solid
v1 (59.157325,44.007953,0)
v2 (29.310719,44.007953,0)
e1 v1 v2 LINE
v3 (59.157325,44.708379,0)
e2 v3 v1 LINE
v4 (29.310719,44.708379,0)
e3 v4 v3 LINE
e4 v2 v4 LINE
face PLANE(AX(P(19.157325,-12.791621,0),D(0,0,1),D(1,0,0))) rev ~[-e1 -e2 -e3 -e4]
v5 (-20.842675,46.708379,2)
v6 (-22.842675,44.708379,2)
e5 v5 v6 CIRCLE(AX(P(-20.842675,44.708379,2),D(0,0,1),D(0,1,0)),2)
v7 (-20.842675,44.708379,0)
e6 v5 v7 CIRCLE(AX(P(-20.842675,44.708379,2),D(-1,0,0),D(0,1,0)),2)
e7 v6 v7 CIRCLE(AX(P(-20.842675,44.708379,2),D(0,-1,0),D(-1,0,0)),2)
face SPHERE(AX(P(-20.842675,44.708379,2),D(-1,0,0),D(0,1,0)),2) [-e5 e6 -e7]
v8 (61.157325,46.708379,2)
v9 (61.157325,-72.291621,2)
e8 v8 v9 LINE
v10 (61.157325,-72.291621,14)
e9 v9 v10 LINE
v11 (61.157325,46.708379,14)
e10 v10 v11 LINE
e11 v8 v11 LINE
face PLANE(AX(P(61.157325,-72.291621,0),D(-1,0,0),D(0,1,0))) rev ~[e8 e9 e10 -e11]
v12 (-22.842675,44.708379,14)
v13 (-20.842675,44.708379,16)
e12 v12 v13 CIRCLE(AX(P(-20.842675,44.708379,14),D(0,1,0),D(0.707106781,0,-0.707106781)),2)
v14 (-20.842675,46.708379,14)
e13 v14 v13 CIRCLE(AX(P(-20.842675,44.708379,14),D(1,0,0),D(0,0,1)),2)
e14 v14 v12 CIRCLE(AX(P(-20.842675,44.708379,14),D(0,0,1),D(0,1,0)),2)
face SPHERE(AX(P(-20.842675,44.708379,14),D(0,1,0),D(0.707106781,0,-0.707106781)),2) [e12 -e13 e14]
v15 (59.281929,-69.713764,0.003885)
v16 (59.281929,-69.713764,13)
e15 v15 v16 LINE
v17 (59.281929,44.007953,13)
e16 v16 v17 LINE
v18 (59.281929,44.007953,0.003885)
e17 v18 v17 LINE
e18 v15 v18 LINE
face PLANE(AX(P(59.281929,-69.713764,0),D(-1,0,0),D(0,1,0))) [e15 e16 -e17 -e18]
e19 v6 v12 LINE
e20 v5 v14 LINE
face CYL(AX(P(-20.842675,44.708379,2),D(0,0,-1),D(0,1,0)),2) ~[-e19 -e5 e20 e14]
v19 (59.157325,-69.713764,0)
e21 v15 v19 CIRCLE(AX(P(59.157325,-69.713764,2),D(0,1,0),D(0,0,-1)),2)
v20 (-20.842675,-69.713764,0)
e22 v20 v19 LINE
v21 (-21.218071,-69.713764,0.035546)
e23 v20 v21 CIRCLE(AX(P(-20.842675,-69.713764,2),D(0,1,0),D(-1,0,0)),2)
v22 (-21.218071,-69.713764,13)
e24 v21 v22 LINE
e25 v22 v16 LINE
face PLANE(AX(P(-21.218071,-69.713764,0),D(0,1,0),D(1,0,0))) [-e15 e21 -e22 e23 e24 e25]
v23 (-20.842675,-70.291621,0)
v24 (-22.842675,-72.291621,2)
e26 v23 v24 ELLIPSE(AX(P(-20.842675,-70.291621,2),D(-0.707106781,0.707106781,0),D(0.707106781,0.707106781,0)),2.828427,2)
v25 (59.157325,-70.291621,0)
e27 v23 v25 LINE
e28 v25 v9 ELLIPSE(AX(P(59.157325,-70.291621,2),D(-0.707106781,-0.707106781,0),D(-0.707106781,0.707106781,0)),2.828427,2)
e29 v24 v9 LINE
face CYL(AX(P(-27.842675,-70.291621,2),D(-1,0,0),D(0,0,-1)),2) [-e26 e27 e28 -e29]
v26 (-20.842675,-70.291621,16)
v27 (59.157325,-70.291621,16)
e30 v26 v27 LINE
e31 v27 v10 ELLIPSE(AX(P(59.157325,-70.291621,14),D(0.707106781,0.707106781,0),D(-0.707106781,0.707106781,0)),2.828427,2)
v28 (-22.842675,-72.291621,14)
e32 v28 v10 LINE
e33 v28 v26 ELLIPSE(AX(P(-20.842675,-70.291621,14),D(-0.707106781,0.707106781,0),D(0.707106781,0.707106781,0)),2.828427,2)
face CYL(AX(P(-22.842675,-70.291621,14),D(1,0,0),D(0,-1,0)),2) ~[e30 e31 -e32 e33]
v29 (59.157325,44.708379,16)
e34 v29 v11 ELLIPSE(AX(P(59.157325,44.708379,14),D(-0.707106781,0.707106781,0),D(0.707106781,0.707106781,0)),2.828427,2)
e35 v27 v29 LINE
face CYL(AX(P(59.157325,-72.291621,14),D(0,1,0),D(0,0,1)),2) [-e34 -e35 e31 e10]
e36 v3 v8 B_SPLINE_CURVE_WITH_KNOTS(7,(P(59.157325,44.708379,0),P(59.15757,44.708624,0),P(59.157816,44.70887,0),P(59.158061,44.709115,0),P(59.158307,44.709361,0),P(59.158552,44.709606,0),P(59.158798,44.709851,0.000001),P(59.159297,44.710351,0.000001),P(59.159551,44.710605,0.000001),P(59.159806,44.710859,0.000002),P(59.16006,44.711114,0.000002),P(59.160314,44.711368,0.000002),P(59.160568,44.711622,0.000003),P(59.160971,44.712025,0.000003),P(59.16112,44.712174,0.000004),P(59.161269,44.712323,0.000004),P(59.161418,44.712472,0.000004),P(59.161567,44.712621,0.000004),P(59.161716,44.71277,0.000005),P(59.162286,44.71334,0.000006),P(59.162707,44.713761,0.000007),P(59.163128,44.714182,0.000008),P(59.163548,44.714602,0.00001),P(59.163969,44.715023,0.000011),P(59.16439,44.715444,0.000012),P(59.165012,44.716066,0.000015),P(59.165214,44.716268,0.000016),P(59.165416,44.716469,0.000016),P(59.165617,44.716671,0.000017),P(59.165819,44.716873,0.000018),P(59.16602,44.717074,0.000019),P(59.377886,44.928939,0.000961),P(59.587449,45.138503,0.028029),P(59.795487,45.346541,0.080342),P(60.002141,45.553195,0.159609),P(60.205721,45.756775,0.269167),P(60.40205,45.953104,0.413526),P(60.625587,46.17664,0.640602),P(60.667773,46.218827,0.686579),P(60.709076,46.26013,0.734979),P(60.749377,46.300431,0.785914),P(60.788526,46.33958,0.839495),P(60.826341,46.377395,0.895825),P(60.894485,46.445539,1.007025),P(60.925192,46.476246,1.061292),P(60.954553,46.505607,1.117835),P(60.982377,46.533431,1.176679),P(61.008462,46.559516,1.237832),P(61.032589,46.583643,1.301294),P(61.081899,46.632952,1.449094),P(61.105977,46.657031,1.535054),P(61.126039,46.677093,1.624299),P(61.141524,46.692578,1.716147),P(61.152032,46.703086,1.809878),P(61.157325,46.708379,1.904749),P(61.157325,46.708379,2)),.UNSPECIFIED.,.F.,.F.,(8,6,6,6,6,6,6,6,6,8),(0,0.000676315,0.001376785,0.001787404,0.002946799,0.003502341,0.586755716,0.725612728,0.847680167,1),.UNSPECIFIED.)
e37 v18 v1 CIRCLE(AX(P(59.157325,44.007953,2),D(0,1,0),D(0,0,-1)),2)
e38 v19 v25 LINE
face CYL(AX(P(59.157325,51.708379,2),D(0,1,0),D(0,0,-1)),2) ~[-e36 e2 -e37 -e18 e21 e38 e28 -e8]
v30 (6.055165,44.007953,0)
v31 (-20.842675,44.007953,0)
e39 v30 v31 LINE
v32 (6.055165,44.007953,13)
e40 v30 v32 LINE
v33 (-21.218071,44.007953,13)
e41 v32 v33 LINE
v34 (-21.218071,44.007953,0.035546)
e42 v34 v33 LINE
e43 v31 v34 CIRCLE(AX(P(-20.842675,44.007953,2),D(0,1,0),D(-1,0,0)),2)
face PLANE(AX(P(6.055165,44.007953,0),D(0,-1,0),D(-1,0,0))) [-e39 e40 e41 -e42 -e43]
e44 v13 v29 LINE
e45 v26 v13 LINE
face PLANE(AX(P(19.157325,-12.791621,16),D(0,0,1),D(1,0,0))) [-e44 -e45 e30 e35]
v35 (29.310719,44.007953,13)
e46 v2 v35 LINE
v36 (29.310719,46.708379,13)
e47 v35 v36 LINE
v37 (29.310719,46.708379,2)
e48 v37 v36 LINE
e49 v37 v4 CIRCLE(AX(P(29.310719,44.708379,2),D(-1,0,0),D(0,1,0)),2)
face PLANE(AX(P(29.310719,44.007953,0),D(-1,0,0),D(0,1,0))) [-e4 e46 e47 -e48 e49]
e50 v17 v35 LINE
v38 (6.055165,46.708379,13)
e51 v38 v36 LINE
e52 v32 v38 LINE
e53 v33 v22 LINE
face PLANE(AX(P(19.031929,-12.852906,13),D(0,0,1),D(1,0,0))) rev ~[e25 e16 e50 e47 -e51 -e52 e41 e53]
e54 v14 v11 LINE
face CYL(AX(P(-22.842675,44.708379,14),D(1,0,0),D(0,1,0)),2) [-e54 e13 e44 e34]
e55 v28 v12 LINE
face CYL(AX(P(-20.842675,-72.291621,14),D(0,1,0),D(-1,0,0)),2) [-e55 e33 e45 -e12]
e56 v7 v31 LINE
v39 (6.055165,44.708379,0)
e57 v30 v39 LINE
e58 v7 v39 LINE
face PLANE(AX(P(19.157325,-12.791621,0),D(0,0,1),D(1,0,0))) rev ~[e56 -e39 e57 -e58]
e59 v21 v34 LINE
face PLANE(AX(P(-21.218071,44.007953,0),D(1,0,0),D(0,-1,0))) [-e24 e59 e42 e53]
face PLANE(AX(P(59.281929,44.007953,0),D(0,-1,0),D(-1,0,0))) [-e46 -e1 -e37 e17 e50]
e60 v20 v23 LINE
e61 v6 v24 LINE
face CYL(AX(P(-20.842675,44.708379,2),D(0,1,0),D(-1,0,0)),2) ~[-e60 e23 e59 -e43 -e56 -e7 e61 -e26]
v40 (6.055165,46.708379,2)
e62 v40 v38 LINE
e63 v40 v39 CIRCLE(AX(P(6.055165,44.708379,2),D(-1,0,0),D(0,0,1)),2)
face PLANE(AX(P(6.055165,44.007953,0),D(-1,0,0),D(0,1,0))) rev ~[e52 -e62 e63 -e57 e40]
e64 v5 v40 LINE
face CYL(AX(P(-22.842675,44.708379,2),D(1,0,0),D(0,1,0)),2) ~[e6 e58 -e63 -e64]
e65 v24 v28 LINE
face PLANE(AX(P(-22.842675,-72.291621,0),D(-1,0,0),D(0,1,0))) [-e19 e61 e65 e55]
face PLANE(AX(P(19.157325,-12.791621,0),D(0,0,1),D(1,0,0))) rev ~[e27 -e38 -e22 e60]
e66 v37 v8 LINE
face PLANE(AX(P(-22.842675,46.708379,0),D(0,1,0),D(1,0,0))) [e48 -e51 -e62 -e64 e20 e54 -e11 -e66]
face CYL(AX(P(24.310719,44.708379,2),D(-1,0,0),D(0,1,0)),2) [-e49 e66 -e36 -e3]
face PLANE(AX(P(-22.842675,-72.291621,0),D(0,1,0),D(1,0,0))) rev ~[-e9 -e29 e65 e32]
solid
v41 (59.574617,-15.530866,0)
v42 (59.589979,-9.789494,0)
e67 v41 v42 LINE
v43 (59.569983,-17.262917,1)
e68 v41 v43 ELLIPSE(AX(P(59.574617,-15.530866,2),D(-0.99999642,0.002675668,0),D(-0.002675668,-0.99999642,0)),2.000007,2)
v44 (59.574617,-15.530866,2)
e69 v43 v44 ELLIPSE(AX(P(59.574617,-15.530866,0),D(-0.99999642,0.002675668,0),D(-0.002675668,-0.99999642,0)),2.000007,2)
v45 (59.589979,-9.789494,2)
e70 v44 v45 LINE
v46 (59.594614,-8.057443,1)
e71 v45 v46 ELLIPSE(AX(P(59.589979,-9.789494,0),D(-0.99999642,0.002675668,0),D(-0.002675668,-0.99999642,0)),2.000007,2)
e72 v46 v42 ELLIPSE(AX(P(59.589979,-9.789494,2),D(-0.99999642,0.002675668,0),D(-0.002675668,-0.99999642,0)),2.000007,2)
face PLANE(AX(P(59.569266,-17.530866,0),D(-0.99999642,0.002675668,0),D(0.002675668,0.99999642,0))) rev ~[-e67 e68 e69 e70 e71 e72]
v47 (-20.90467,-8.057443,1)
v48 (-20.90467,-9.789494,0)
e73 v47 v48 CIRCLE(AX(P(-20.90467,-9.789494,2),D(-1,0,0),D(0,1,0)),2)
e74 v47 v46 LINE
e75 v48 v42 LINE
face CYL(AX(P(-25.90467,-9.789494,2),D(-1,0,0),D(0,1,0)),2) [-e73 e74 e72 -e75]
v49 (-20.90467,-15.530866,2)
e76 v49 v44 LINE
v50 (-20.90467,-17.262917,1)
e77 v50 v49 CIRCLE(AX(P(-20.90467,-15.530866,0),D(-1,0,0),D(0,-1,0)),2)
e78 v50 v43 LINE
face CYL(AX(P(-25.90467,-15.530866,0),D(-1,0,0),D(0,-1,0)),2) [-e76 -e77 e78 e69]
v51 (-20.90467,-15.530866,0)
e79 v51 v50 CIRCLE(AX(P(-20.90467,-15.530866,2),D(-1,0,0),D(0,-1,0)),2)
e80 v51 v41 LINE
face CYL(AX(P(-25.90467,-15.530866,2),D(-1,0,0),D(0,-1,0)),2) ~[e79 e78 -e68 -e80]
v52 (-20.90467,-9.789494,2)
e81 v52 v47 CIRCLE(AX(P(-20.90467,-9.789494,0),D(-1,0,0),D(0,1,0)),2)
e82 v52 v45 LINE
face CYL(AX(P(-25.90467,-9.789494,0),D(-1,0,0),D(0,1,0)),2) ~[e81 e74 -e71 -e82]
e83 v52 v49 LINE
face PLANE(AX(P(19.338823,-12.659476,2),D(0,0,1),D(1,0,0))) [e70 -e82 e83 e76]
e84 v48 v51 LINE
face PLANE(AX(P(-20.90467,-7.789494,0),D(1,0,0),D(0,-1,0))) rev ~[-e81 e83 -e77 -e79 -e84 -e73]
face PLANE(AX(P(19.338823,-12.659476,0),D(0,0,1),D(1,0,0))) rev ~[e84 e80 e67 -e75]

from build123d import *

# Parameters (mm, degrees)
F0_W         = 84
F0_H         = 119
F1_DEPTH     = 16
F2_W         = 23.2555542788
F2_H         = 5.3250671498
F3_DEPTH     = 13
F4_R         = 2
F5_T1_DEPTH  = 122
F5_T3_DEPTH  = 94
F5_T5_DEPTH  = 129
F5_T7_DEPTH  = 41.8466055248
F5_T9_DEPTH  = 12
F5_S13_W     = 2
F5_S13_H     = 2
F5_T14_DEPTH = 2
F5_T18_ANGLE = 90
F7_DEPTH     = 2
F8_T1_DEPTH  = 90.4739352316
F8_T3_DEPTH  = 90.5


# Not quite as in the source:
# - a fillet or chamfer that OpenCascade refuses, or shapes differently, is made with other operations: its cross-section is extruded or revolved along the edge and cut away or added


with BuildPart() as f1:
    # F0 (on Top) → F1 (new body)
    with BuildSketch(Plane.XY):
        with Locations((19.1573249176, -12.7916212418)):
            Rectangle(F0_W, F0_H)
    extrude(amount=F1_DEPTH)

    # F2 (on Top) → F3 (cut)
    with BuildSketch(Plane.XY):
        Polygon((6.055165114, 44.0079532564), (-21.2180707604, 44.0079532564), (-21.2180707604, -69.7137644664), (59.2819292396, -69.7137644664), (59.2819292396, 44.0079532564), (29.3107193928, 44.0079532564), align=None)
        with Locations((17.6829422534, 46.6704868313)):
            Rectangle(F2_W, F2_H)
    extrude(amount=F3_DEPTH, mode=Mode.SUBTRACT)

    # F4
    f4_edges = [f1.edges().sort_by_distance(p)[0] for p in [
        (61.157325, -12.791621, 16),
        (19.157325, -72.291621, 16),
        (-22.842675, -12.791621, 16),
        (19.157325, 46.708379, 16),
        (-8.393755, 46.708379, 0),
    ]]
    fillet(f4_edges, radius=F4_R)

    # F5: fillet of radius 2 on 4 edges, made by hand

    # F5_s2 → F5_t1 (cut)
    with BuildSketch(Plane.XZ.offset(-44.7083787582)):
        with BuildLine():
            ThreePointArc((-22.8426750824, 2), (-22.2568886448, 0.5857864376), (-20.8426750824, 0))
            Line((-20.8426750824, 0), (-22.8426750824, 0))
            Line((-22.8426750824, 0), (-22.8426750824, 2))
        make_face()
    extrude(amount=F5_T1_DEPTH, mode=Mode.SUBTRACT)

    # F5_s4 → F5_t3 (cut)
    with BuildSketch(Plane.YZ.offset(-27.8426750824)):
        with BuildLine():
            ThreePointArc((-70.2916212418, 0), (-71.7058348042, 0.5857864376), (-72.2916212418, 2))
            Line((-72.2916212418, 2), (-72.2916212418, 0))
            Line((-72.2916212418, 0), (-70.2916212418, 0))
        make_face()
    extrude(amount=F5_T3_DEPTH, mode=Mode.SUBTRACT)

    # F5_s6 → F5_t5 (cut)
    with BuildSketch(Plane.XZ.offset(-51.7083787582)):
        with BuildLine():
            ThreePointArc((59.1573249176, 0), (60.57153848, 0.5857864376), (61.1573249176, 2))
            Line((61.1573249176, 2), (61.1573249176, 0))
            Line((61.1573249176, 0), (59.1573249176, 0))
        make_face()
    extrude(amount=F5_T5_DEPTH, mode=Mode.SUBTRACT)

    # F5_s8 → F5_t7 (cut)
    with BuildSketch(Plane.YZ.offset(24.3107193928)):
        with BuildLine():
            ThreePointArc((46.7083787582, 2), (46.1225923205, 0.5857864376), (44.7083787582, 0))
            Line((44.7083787582, 0), (46.7083787582, 0))
            Line((46.7083787582, 0), (46.7083787582, 2))
        make_face()
    extrude(amount=F5_T7_DEPTH, mode=Mode.SUBTRACT)

    # F5_s10 → F5_t9 (cut)
    with BuildSketch(Plane.XY.offset(2)):
        with BuildLine():
            ThreePointArc((-20.8426750824, 46.7083787582), (-22.2568886448, 46.1225923205), (-22.8426750824, 44.7083787582))
            Line((-22.8426750824, 44.7083787582), (-22.8426750824, 46.7083787582))
            Line((-22.8426750824, 46.7083787582), (-20.8426750824, 46.7083787582))
        make_face()
    extrude(amount=F5_T9_DEPTH, mode=Mode.SUBTRACT)


with BuildPart() as f5_tool12:
    # F5_s13 → F5_t14 (new body)
    with BuildSketch(Plane.XZ.offset(-44.7083787582)):
        with Locations((-21.8426750824, 15)):
            Rectangle(F5_S13_W, F5_S13_H)
    extrude(amount=-F5_T14_DEPTH)

    # F5_s15 → F5_t16 (revolve, cut)
    with BuildSketch(Plane(origin=(-20.8426750824, 44.7083787582, 14), x_dir=(0.7071067812, 0, -0.7071067812), z_dir=(0.7071067812, 0, 0.7071067812))):
        with BuildLine():
            ThreePointArc((0, -2), (2, 0), (0, 2))
            Line((0, 2), (0, -2))
        make_face()
    revolve(axis=Axis((-20.8426750824, 44.7083787582, 14), (0, 1, 0)), mode=Mode.SUBTRACT)


with BuildPart() as f1_1:
    add(f1.part)

    # F5_t11: cut F5_tool12
    add(f5_tool12.part, mode=Mode.SUBTRACT)

    # F5_s17 → F5_t18 (revolve, cut)
    with BuildSketch(Plane.XY.offset(2)):
        with BuildLine():
            ThreePointArc((-20.8426750824, 46.7083787582), (-22.2568886448, 46.1225923205), (-22.8426750824, 44.7083787582))
            Line((-22.8426750824, 44.7083787582), (-22.8426750824, 46.7083787582))
            Line((-22.8426750824, 46.7083787582), (-20.8426750824, 46.7083787582))
        make_face()
    revolve(axis=Axis((-22.8426750824, 44.7083787582, 2), (-1, 0, 0)), revolution_arc=F5_T18_ANGLE, mode=Mode.SUBTRACT)


with BuildPart() as f7:
    # F6 (on Top) → F7 (new body)
    with BuildSketch(Plane.XY):
        Polygon((59.5953304619, -7.7894940041), (-20.9046695381, -7.7894940041), (-20.9046695381, -17.5308659673), (59.5692656934, -17.5308659673), align=None)
    extrude(amount=F7_DEPTH)

    # F8: fillet of radius 2 on 4 edges, made by hand

    # F8_s2 → F8_t1 (cut)
    with BuildSketch(Plane.YZ.offset(-25.9046695381)):
        with BuildLine():
            ThreePointArc((-17.5308659673, 2), (-16.9450795296, 0.5857864376), (-15.5308659673, 0))
            Line((-15.5308659673, 0), (-17.5308659673, 0))
            Line((-17.5308659673, 0), (-17.5308659673, 2))
        make_face()
        with BuildLine():
            ThreePointArc((-17.5308659673, 0), (-16.9450795296, 1.4142135624), (-15.5308659673, 2))
            Line((-15.5308659673, 2), (-17.5308659673, 2))
            Line((-17.5308659673, 2), (-17.5308659673, 0))
        make_face()
    extrude(amount=F8_T1_DEPTH, mode=Mode.SUBTRACT)

    # F8_s4 → F8_t3 (cut)
    with BuildSketch(Plane.YZ.offset(-25.9046695381)):
        with BuildLine():
            ThreePointArc((-7.7894940041, 2), (-8.3752804417, 0.5857864376), (-9.7894940041, 0))
            Line((-9.7894940041, 0), (-7.7894940041, 0))
            Line((-7.7894940041, 0), (-7.7894940041, 2))
        make_face()
        with BuildLine():
            ThreePointArc((-7.7894940041, 0), (-8.3752804417, 1.4142135624), (-9.7894940041, 2))
            Line((-9.7894940041, 2), (-7.7894940041, 2))
            Line((-7.7894940041, 2), (-7.7894940041, 0))
        make_face()
    extrude(amount=F8_T3_DEPTH, mode=Mode.SUBTRACT)


solid = Compound([f1_1.part, f7.part])
